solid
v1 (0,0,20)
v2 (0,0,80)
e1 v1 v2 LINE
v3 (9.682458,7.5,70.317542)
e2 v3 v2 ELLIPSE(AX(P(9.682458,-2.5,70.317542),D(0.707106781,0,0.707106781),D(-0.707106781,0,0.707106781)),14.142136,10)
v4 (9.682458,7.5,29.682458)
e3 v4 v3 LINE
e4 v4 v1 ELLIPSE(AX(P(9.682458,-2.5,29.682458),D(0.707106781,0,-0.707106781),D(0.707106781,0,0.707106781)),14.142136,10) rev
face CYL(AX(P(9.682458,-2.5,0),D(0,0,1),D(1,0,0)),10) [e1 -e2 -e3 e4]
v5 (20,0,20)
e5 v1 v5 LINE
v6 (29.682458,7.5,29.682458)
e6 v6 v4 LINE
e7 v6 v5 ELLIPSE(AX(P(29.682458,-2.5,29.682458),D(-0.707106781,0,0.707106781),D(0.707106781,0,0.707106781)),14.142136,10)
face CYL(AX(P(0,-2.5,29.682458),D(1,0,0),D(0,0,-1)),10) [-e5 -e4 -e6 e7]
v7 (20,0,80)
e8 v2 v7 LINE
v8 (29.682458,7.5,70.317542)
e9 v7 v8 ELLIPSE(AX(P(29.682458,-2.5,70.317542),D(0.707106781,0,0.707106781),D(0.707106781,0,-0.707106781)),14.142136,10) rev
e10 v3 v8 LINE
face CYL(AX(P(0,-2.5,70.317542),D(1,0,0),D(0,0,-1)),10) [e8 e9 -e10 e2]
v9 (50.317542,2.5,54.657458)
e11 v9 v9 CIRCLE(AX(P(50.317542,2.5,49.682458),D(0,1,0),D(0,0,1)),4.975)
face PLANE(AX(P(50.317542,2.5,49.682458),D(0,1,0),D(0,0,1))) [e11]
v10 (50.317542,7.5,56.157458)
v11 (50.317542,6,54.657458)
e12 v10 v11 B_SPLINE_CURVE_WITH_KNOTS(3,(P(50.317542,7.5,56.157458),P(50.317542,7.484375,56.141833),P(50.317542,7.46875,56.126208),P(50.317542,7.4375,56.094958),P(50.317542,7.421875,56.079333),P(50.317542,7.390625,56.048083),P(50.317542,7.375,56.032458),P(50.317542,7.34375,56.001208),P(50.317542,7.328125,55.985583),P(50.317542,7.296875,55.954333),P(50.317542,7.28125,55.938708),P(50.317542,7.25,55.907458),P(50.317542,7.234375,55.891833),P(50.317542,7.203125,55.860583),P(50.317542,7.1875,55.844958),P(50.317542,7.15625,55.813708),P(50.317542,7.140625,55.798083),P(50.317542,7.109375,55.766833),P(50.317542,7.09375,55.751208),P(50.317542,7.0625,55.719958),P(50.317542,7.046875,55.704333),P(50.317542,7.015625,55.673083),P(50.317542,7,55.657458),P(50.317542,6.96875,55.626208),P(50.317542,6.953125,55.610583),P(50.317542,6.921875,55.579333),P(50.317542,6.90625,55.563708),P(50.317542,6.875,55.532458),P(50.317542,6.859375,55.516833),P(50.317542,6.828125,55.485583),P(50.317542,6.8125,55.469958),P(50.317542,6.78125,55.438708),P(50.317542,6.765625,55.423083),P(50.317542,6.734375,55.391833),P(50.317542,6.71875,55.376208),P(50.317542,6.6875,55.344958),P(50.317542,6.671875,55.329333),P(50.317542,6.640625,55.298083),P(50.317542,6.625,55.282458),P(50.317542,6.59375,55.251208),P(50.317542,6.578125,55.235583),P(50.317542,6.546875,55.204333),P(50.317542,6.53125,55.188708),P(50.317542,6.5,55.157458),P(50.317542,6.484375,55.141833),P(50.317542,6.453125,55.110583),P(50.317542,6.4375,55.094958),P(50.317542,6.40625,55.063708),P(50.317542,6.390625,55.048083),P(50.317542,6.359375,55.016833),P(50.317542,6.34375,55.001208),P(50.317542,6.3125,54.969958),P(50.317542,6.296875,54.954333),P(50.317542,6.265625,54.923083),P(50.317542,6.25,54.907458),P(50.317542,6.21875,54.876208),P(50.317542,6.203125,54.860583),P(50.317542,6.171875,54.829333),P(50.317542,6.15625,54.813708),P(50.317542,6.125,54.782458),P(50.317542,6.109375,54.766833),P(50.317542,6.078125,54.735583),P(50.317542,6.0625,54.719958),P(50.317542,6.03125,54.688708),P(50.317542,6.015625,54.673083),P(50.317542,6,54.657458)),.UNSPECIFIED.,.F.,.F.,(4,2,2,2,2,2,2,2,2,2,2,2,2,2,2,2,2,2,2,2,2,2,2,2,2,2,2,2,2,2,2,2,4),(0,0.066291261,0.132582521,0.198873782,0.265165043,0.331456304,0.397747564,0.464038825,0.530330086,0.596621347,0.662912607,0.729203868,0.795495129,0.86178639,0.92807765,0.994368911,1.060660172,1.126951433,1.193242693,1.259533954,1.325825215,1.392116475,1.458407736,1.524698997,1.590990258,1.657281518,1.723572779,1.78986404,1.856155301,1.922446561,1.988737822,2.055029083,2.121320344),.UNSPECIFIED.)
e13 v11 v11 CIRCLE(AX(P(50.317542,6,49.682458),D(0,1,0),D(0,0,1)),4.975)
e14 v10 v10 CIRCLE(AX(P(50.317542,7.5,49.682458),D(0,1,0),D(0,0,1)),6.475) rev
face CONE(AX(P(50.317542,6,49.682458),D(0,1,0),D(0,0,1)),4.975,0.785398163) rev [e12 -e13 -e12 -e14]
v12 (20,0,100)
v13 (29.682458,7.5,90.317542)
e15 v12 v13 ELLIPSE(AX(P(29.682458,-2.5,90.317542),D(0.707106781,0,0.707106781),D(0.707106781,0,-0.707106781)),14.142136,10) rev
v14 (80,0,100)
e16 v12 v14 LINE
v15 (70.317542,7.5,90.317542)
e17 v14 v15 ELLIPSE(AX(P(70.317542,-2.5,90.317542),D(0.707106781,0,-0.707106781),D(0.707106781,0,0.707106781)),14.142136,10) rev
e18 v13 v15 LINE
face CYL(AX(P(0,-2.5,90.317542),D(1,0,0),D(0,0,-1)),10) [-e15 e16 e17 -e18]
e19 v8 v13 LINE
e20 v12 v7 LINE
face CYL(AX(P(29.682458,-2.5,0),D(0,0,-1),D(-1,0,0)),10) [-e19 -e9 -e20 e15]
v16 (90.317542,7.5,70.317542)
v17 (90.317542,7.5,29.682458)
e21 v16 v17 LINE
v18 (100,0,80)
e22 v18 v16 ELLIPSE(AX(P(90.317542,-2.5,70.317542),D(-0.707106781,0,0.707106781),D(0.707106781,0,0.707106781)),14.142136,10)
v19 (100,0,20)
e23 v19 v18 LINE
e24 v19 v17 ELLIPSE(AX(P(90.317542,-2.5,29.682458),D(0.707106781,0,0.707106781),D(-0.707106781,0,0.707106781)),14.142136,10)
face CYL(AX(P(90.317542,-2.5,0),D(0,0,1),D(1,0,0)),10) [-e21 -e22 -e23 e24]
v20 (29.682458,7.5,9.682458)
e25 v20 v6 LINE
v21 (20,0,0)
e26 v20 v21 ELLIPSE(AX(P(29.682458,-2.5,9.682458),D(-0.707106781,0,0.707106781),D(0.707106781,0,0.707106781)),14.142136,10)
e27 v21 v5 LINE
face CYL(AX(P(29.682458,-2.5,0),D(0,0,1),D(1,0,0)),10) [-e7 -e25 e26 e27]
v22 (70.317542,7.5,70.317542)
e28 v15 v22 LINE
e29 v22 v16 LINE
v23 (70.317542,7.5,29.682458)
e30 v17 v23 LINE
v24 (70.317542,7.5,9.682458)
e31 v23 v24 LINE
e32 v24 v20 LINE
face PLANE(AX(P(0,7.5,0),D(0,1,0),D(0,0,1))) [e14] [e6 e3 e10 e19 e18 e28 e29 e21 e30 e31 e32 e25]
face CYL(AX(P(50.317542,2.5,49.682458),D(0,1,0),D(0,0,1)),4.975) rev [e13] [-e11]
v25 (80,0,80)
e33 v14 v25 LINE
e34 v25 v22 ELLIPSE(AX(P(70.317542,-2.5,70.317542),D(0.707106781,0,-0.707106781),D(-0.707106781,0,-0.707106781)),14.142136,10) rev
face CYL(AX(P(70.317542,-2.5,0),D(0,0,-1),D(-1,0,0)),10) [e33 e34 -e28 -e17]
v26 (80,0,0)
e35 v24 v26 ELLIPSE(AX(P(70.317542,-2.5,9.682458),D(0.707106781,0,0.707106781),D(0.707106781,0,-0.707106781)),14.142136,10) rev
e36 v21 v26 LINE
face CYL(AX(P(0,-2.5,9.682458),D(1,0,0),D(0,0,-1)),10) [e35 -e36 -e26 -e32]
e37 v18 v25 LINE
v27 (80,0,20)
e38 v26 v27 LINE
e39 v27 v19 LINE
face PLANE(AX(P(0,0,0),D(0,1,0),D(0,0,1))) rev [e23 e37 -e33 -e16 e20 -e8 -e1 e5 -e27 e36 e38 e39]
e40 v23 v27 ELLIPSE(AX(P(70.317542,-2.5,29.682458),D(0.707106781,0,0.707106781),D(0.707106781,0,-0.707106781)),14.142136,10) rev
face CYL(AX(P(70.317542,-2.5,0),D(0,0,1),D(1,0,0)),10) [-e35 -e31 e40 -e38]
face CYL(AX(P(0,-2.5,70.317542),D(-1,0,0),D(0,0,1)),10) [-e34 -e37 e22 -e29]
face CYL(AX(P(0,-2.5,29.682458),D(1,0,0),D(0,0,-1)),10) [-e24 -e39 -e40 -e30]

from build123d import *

# Parameters (mm, degrees)
BOSS_EXTRUDE1_DEPTH = 7.5
FILLET1_R           = 10
SKETCH2_R           = 4.975
CUT_EXTRUDE1_DEPTH  = 5
CHAMFER2_SIZE       = 1.5


with BuildPart() as part:
    # Sketch1 → Boss-Extrude1 (new body)
    with BuildSketch(Plane(origin=(0, 0, 0), x_dir=(1, 0, 0), z_dir=(0, 1, 0))):
        Polygon((80, 0), (20, 0), (20, -20), (0, -20), (0, -80), (20, -80), (20, -100), (80, -100), (80, -80), (100, -80), (100, -20), (80, -20), align=None)
    extrude(amount=BOSS_EXTRUDE1_DEPTH)

    # Fillet1
    # the kernel refuses this fillet: 10 mm, written as the material it takes off along each edge
    with BuildSketch(Plane(origin=(-24.206145914, 7.5, 80), x_dir=(0, -1, 0), z_dir=(1, 0, 0)), Plane(origin=(20, 7.5, 80), x_dir=(0, -1, 0), z_dir=(0, 0, 1)), Plane(origin=(80, 7.5, 124.206145914), x_dir=(0, -1, 0), z_dir=(0, 0, -1)), Plane(origin=(80, 7.5, 80), x_dir=(0, -1, 0), z_dir=(1, 0, 0)), Plane(origin=(124.206145914, 7.5, 20), x_dir=(0, -1, 0), z_dir=(-1, 0, 0)), Plane(origin=(80, 7.5, 20), x_dir=(0, -1, 0), z_dir=(0, 0, -1)), Plane(origin=(20, 7.5, -24.206145914), x_dir=(0, -1, 0), z_dir=(0, 0, 1)), Plane(origin=(20, 7.5, 20), x_dir=(0, -1, 0), z_dir=(-1, 0, 0))) as fillet1_piece_1:
        with BuildLine():
            CenterArc((10, 9.682458366), FILLET1_R, 180, 75.522487814)
            Line((0, 9.682458366), (-0.2, 9.682458366))
            Line((-0.2, 9.682458366), (-0.2, 0))
            Line((-0.2, 0), (0, -0.2))
            ThreePointArc((0, -0.2), (3.75, -0.2), (7.45, -0.193649167))
            Line((7.45, -0.193649167), (7.5, 0))
        make_face()
    extrude(amount=44.206145914, mode=Mode.SUBTRACT)
    with BuildSketch(Plane(origin=(-4.206145914, 7.5, 100), x_dir=(0, -1, 0), z_dir=(1, 0, 0)), Plane(origin=(100, 7.5, 104.206145914), x_dir=(0, -1, 0), z_dir=(0, 0, -1)), Plane(origin=(104.206145914, 7.5, 0), x_dir=(0, -1, 0), z_dir=(-1, 0, 0)), Plane(origin=(0, 7.5, -4.206145914), x_dir=(0, -1, 0), z_dir=(0, 0, 1))) as fillet1_piece_2:
        with BuildLine():
            CenterArc((10, 9.682458366), FILLET1_R, 180, 75.522487814)
            Line((0, 9.682458366), (-0.2, 9.682458366))
            Line((-0.2, 9.682458366), (-0.2, 0))
            Line((-0.2, 0), (0, -0.2))
            ThreePointArc((0, -0.2), (3.75, -0.2), (7.45, -0.193649167))
            Line((7.45, -0.193649167), (7.5, 0))
        make_face()
    extrude(amount=108.412291828, mode=Mode.SUBTRACT)
    with BuildSketch(Plane(origin=(-24.206145914, 7.5, 80), x_dir=(0, -1, 0), z_dir=(1, 0, 0))) as fillet1_piece_3a_section:
        with BuildLine():
            CenterArc((10, 9.682458366), FILLET1_R, 180, 75.522487814)
            Line((0, 9.682458366), (-0.2, 9.682458366))
            Line((-0.2, 9.682458366), (-0.2, 0))
            Line((-0.2, 0), (0, -0.2))
            ThreePointArc((0, -0.2), (3.75, -0.2), (7.45, -0.193649167))
            Line((7.45, -0.193649167), (7.5, 0))
        make_face()
    fillet1_piece_3a = extrude(amount=68.412291828, mode=Mode.PRIVATE)
    fillet1_piece_3a = split(fillet1_piece_3a, bisect_by=Plane(origin=(20, 5.604082443, 77.718558992), z_dir=(1, 0, 0)), keep=Keep.TOP, mode=Mode.PRIVATE)
    with BuildSketch(Plane(origin=(20, 7.5, 55.793854086), x_dir=(0, -1, 0), z_dir=(0, 0, 1))) as fillet1_piece_3b_section:
        with BuildLine():
            CenterArc((10, 9.682458366), FILLET1_R, 180, 75.522487814)
            Line((0, 9.682458366), (-0.2, 9.682458366))
            Line((-0.2, 9.682458366), (-0.2, 0))
            Line((-0.2, 0), (0, -0.2))
            ThreePointArc((0, -0.2), (3.75, -0.2), (7.45, -0.193649167))
            Line((7.45, -0.193649167), (7.5, 0))
        make_face()
    fillet1_piece_3b = extrude(amount=68.412291828, mode=Mode.PRIVATE)
    fillet1_piece_3b = split(fillet1_piece_3b, bisect_by=Plane(origin=(22.281441008, 5.604082443, 80), z_dir=(0, 0, -1)), keep=Keep.TOP, mode=Mode.PRIVATE)
    fillet1_piece_3 = fillet1_piece_3a & fillet1_piece_3b
    add(fillet1_piece_3, mode=Mode.SUBTRACT)
    with BuildSketch(Plane(origin=(80, 7.5, 124.206145914), x_dir=(0, -1, 0), z_dir=(0, 0, -1))) as fillet1_piece_4a_section:
        with BuildLine():
            CenterArc((10, 9.682458366), FILLET1_R, 180, 75.522487814)
            Line((0, 9.682458366), (-0.2, 9.682458366))
            Line((-0.2, 9.682458366), (-0.2, 0))
            Line((-0.2, 0), (0, -0.2))
            ThreePointArc((0, -0.2), (3.75, -0.2), (7.45, -0.193649167))
            Line((7.45, -0.193649167), (7.5, 0))
        make_face()
    fillet1_piece_4a = extrude(amount=68.412291828, mode=Mode.PRIVATE)
    fillet1_piece_4a = split(fillet1_piece_4a, bisect_by=Plane(origin=(77.718558992, 5.604082443, 80), z_dir=(0, 0, -1)), keep=Keep.TOP, mode=Mode.PRIVATE)
    with BuildSketch(Plane(origin=(55.793854086, 7.5, 80), x_dir=(0, -1, 0), z_dir=(1, 0, 0))) as fillet1_piece_4b_section:
        with BuildLine():
            CenterArc((10, 9.682458366), FILLET1_R, 180, 75.522487814)
            Line((0, 9.682458366), (-0.2, 9.682458366))
            Line((-0.2, 9.682458366), (-0.2, 0))
            Line((-0.2, 0), (0, -0.2))
            ThreePointArc((0, -0.2), (3.75, -0.2), (7.45, -0.193649167))
            Line((7.45, -0.193649167), (7.5, 0))
        make_face()
    fillet1_piece_4b = extrude(amount=68.412291828, mode=Mode.PRIVATE)
    fillet1_piece_4b = split(fillet1_piece_4b, bisect_by=Plane(origin=(80, 5.604082443, 77.718558992), z_dir=(-1, 0, 0)), keep=Keep.TOP, mode=Mode.PRIVATE)
    fillet1_piece_4 = fillet1_piece_4a & fillet1_piece_4b
    add(fillet1_piece_4, mode=Mode.SUBTRACT)
    with BuildSketch(Plane(origin=(124.206145914, 7.5, 20), x_dir=(0, -1, 0), z_dir=(-1, 0, 0))) as fillet1_piece_5a_section:
        with BuildLine():
            CenterArc((10, 9.682458366), FILLET1_R, 180, 75.522487814)
            Line((0, 9.682458366), (-0.2, 9.682458366))
            Line((-0.2, 9.682458366), (-0.2, 0))
            Line((-0.2, 0), (0, -0.2))
            ThreePointArc((0, -0.2), (3.75, -0.2), (7.45, -0.193649167))
            Line((7.45, -0.193649167), (7.5, 0))
        make_face()
    fillet1_piece_5a = extrude(amount=68.412291828, mode=Mode.PRIVATE)
    fillet1_piece_5a = split(fillet1_piece_5a, bisect_by=Plane(origin=(80, 5.604082443, 22.281441008), z_dir=(-1, 0, 0)), keep=Keep.TOP, mode=Mode.PRIVATE)
    with BuildSketch(Plane(origin=(80, 7.5, 44.206145914), x_dir=(0, -1, 0), z_dir=(0, 0, -1))) as fillet1_piece_5b_section:
        with BuildLine():
            CenterArc((10, 9.682458366), FILLET1_R, 180, 75.522487814)
            Line((0, 9.682458366), (-0.2, 9.682458366))
            Line((-0.2, 9.682458366), (-0.2, 0))
            Line((-0.2, 0), (0, -0.2))
            ThreePointArc((0, -0.2), (3.75, -0.2), (7.45, -0.193649167))
            Line((7.45, -0.193649167), (7.5, 0))
        make_face()
    fillet1_piece_5b = extrude(amount=68.412291828, mode=Mode.PRIVATE)
    fillet1_piece_5b = split(fillet1_piece_5b, bisect_by=Plane(origin=(77.718558992, 5.604082443, 20), z_dir=(0, 0, 1)), keep=Keep.TOP, mode=Mode.PRIVATE)
    fillet1_piece_5 = fillet1_piece_5a & fillet1_piece_5b
    add(fillet1_piece_5, mode=Mode.SUBTRACT)
    with BuildSketch(Plane(origin=(20, 7.5, -24.206145914), x_dir=(0, -1, 0), z_dir=(0, 0, 1))) as fillet1_piece_6a_section:
        with BuildLine():
            CenterArc((10, 9.682458366), FILLET1_R, 180, 75.522487814)
            Line((0, 9.682458366), (-0.2, 9.682458366))
            Line((-0.2, 9.682458366), (-0.2, 0))
            Line((-0.2, 0), (0, -0.2))
            ThreePointArc((0, -0.2), (3.75, -0.2), (7.45, -0.193649167))
            Line((7.45, -0.193649167), (7.5, 0))
        make_face()
    fillet1_piece_6a = extrude(amount=68.412291828, mode=Mode.PRIVATE)
    fillet1_piece_6a = split(fillet1_piece_6a, bisect_by=Plane(origin=(22.281441008, 5.604082443, 20), z_dir=(0, 0, 1)), keep=Keep.TOP, mode=Mode.PRIVATE)
    with BuildSketch(Plane(origin=(44.206145914, 7.5, 20), x_dir=(0, -1, 0), z_dir=(-1, 0, 0))) as fillet1_piece_6b_section:
        with BuildLine():
            CenterArc((10, 9.682458366), FILLET1_R, 180, 75.522487814)
            Line((0, 9.682458366), (-0.2, 9.682458366))
            Line((-0.2, 9.682458366), (-0.2, 0))
            Line((-0.2, 0), (0, -0.2))
            ThreePointArc((0, -0.2), (3.75, -0.2), (7.45, -0.193649167))
            Line((7.45, -0.193649167), (7.5, 0))
        make_face()
    fillet1_piece_6b = extrude(amount=68.412291828, mode=Mode.PRIVATE)
    fillet1_piece_6b = split(fillet1_piece_6b, bisect_by=Plane(origin=(20, 5.604082443, 22.281441008), z_dir=(1, 0, 0)), keep=Keep.TOP, mode=Mode.PRIVATE)
    fillet1_piece_6 = fillet1_piece_6a & fillet1_piece_6b
    add(fillet1_piece_6, mode=Mode.SUBTRACT)

    # Sketch2 → Cut-Extrude1 (cut)
    with BuildSketch(Plane(origin=(0, 7.5, 0), x_dir=(1, 0, 0), z_dir=(0, 1, 0))):
        with Locations(Location((50.317541634, -49.682458366, 0), (0, 0, 270))):
            Circle(SKETCH2_R)
    extrude(amount=-CUT_EXTRUDE1_DEPTH, mode=Mode.SUBTRACT)

    # Chamfer2
    chamfer2_edges = [part.edges().sort_by_distance(p)[0] for p in [
        (50.317541634, 7.5, 44.707458366),
    ]]
    chamfer(chamfer2_edges, length=CHAMFER2_SIZE)


solid = part.part
